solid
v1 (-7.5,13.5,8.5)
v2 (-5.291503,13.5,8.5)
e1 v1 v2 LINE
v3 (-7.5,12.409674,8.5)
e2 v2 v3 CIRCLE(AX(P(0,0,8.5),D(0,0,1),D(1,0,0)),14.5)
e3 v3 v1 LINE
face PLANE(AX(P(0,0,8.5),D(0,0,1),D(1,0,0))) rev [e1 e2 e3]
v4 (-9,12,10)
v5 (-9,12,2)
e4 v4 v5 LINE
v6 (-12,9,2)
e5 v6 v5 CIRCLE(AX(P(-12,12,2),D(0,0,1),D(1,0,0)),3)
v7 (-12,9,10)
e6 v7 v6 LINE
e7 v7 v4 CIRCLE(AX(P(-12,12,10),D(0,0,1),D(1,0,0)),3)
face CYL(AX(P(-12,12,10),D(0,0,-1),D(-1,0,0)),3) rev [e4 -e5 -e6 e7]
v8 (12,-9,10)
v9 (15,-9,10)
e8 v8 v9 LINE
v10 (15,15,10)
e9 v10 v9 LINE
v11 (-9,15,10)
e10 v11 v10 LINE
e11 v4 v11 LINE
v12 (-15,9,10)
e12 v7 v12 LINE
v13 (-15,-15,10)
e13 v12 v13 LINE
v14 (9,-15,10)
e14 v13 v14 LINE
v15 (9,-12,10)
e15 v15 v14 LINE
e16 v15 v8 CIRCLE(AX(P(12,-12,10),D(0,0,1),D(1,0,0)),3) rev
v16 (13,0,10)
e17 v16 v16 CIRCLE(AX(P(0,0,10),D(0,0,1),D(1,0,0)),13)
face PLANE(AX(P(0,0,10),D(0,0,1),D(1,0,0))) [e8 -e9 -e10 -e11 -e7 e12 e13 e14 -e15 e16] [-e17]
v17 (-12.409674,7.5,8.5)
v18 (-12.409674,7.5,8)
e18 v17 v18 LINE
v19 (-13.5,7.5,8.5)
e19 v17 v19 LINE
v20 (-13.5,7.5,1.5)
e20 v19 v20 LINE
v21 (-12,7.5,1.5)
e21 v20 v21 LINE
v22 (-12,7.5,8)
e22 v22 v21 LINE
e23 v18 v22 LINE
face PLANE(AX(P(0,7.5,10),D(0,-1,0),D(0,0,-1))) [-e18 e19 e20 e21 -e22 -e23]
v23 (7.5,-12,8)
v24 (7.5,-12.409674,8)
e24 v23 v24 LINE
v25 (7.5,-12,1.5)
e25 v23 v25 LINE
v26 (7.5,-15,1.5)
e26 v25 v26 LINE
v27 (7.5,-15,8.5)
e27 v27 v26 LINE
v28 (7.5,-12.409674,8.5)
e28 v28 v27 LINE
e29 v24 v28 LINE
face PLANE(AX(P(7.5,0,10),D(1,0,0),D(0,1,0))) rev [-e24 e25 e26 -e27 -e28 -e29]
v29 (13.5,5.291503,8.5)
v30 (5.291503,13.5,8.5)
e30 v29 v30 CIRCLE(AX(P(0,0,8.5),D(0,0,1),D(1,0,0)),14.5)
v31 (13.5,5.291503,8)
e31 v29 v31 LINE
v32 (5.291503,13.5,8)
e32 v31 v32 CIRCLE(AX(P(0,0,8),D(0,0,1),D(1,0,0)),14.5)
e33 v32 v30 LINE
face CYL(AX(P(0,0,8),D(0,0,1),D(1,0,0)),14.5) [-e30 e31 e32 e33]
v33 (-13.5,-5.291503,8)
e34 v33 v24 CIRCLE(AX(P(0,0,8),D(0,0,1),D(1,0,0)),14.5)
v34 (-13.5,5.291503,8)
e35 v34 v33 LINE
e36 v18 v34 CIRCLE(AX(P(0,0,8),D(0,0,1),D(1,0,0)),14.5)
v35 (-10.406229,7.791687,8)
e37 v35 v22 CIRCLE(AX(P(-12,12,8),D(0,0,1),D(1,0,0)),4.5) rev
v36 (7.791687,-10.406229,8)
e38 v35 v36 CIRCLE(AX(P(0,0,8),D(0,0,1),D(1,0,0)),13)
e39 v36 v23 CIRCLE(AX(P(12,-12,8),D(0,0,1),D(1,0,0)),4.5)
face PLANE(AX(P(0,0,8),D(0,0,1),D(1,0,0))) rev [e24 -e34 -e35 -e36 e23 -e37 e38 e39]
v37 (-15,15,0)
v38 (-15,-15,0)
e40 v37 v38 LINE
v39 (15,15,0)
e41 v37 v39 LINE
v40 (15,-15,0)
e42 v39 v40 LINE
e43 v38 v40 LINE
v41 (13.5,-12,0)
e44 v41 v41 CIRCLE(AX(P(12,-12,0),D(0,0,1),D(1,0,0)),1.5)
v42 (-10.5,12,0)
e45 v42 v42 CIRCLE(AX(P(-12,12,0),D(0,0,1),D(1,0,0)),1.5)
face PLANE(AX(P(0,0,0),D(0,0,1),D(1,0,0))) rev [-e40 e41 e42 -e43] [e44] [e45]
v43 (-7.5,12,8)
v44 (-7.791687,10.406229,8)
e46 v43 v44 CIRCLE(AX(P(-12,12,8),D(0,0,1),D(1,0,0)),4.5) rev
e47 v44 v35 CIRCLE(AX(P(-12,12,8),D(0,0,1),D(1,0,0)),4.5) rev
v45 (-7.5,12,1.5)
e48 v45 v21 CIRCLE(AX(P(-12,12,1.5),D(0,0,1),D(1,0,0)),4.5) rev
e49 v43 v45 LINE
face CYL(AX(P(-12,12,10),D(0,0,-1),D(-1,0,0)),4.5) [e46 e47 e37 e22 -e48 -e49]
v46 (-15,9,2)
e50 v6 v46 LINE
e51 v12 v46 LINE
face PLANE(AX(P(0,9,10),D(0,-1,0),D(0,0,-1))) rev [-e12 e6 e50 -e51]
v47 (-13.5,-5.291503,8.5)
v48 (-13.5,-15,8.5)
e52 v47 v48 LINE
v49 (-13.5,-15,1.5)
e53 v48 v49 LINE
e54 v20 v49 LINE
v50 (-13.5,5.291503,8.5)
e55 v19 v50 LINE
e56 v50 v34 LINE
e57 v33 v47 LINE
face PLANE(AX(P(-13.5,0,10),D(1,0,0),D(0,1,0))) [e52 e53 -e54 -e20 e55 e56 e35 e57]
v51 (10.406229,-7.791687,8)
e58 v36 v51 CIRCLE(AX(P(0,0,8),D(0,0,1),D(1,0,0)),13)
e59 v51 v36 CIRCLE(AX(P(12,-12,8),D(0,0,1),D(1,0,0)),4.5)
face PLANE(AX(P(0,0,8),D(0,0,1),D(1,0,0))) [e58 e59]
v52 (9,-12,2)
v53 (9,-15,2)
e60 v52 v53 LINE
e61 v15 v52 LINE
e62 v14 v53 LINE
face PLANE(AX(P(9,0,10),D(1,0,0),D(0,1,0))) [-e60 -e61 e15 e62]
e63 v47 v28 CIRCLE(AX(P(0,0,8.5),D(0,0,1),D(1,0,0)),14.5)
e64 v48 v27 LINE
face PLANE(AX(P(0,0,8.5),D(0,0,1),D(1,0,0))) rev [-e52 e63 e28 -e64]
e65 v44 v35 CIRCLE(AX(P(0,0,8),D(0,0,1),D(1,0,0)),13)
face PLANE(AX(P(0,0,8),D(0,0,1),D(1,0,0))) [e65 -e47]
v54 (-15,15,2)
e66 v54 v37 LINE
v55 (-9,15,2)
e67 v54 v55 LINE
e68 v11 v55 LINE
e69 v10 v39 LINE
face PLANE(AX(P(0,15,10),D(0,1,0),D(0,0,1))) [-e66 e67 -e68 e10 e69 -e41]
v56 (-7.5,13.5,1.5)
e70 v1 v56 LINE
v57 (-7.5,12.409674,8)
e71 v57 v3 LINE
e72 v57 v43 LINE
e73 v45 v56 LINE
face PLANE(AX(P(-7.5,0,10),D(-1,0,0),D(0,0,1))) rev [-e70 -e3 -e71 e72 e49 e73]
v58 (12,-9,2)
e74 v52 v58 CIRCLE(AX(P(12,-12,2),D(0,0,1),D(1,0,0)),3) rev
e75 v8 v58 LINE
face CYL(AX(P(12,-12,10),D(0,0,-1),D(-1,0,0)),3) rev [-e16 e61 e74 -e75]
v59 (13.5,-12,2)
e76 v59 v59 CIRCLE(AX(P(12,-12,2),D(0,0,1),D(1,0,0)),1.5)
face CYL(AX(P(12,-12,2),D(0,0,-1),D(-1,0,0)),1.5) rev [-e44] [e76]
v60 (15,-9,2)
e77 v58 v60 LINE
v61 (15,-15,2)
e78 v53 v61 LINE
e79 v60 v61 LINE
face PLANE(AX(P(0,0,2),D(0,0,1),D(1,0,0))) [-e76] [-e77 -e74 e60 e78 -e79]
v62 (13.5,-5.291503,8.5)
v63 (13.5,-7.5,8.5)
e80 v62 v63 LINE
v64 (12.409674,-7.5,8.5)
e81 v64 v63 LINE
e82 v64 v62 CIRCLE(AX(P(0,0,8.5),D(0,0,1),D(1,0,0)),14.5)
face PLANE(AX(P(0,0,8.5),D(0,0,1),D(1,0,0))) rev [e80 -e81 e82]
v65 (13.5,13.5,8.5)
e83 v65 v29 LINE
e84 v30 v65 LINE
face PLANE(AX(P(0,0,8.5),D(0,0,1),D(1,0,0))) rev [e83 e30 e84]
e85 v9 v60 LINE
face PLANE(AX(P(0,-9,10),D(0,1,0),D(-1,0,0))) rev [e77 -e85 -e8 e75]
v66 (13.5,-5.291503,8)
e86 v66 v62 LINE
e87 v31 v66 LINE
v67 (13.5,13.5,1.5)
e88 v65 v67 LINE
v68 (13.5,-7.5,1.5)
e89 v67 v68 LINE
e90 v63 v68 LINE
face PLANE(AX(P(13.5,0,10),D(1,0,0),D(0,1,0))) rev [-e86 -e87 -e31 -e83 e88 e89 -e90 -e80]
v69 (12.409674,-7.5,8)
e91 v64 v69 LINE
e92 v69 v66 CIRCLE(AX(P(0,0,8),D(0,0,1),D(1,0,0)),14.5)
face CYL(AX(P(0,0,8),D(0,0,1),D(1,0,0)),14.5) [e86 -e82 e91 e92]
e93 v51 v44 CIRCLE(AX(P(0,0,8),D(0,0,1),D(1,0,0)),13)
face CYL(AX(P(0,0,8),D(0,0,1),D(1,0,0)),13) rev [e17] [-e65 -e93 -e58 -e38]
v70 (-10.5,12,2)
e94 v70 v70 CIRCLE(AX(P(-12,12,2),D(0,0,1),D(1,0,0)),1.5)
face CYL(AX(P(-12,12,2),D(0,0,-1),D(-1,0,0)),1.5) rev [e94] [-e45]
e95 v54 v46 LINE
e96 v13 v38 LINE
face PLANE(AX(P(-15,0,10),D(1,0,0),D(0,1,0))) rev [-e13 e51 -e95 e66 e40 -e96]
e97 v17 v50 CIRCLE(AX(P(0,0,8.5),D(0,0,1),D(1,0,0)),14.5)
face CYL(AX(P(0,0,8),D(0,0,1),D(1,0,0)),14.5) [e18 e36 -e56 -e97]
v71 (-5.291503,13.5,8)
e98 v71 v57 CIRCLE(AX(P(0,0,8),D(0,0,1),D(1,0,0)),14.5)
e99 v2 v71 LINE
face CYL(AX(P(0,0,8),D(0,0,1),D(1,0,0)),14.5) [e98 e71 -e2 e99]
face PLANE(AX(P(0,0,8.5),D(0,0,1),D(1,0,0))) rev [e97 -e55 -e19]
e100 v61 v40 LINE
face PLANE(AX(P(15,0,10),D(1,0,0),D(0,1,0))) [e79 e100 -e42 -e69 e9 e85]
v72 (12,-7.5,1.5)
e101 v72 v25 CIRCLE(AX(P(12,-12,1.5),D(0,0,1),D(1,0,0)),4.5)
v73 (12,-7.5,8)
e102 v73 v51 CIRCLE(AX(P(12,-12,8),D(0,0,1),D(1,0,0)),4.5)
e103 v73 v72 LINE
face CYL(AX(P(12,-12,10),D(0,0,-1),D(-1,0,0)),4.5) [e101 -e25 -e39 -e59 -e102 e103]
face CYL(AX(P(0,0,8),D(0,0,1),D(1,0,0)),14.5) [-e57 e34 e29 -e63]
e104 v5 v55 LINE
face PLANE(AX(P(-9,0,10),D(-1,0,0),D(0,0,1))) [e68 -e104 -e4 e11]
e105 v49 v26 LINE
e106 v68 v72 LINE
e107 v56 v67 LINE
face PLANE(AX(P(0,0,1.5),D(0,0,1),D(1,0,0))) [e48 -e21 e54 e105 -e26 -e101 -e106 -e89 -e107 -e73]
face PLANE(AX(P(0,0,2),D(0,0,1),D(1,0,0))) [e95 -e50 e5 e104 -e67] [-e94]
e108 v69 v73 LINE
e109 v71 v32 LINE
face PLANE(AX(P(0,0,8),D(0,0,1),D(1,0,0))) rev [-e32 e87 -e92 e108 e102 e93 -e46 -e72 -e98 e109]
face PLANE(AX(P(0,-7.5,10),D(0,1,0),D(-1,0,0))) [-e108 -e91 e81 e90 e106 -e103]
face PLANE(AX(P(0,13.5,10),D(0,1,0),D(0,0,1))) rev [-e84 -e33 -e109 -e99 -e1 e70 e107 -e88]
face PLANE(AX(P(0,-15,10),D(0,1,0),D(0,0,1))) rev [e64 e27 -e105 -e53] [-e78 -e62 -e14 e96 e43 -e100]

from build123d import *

# Parameters (mm, degrees)
RESSALTO_EXTRUS_O1_DEPTH = 10
ESBO_O1_3_R              = 1.5
RESSALTO_EXTRUS_O2_DEPTH = 2
ESBO_O2_R                = 13
CORTE_EXTRUS_O1_DEPTH    = 2
CASCA1_START             = 1.5
CASCA1_DEPTH             = 6.5
CASCA1_START_2           = 8
CASCA1_2_DEPTH           = 0.5


# Read off the part's stored shape, not the designer's step: Casca1
with BuildPart() as part:
    # Esboço1 → Ressalto-extrusão1 (new body)
    with BuildSketch(Plane.XY):
        with BuildLine():
            Line((-9, 15), (-9, 12))
            ThreePointArc((-9, 12), (-9.878679656, 9.878679656), (-12, 9))
            Line((-12, 9), (-15, 9))
            Line((-15, 9), (-15, -15))
            Line((-15, -15), (9, -15))
            Line((9, -15), (9, -12))
            ThreePointArc((9, -12), (9.878679656, -9.878679656), (12, -9))
            Line((12, -9), (15, -9))
            Line((15, -9), (15, 15))
            Line((15, 15), (-9, 15))
        make_face()
    extrude(amount=RESSALTO_EXTRUS_O1_DEPTH)

    # Esboço1<3> → Ressalto-extrusão2 (add)
    # profile 1 of 2: a face of its own
    with BuildSketch(Plane.XY):
        with BuildLine():
            ThreePointArc((-12, 9), (-9.878679656, 9.878679656), (-9, 12))
            Line((-9, 12), (-9, 15))
            Line((-9, 15), (-15, 15))
            Line((-15, 15), (-15, 9))
            Line((-15, 9), (-12, 9))
        make_face()
        with Locations((-12, 12)):
            Circle(ESBO_O1_3_R, mode=Mode.SUBTRACT)
    # profile 2 of 2: a face of its own
    with BuildSketch(Plane.XY):
        with BuildLine():
            Line((15, -15), (15, -9))
            Line((15, -9), (12, -9))
            ThreePointArc((12, -9), (9.878679656, -9.878679656), (9, -12))
            Line((9, -12), (9, -15))
            Line((9, -15), (15, -15))
        make_face()
        with Locations((12, -12)):
            Circle(ESBO_O1_3_R, mode=Mode.SUBTRACT)
    extrude(amount=RESSALTO_EXTRUS_O2_DEPTH)

    # Esboço2 → Corte-extrusão1 (cut)
    with BuildSketch(Plane.XY.offset(10)):
        Circle(ESBO_O2_R)
    extrude(amount=-CORTE_EXTRUS_O1_DEPTH, mode=Mode.SUBTRACT)

    # Casca1 outline → Casca1 (cut)
    with BuildSketch(Plane.XY.offset(CASCA1_START)):
        with BuildLine():
            Line((-13.5, -15), (7.5, -15))
            Line((7.5, -15), (7.5, -12))
            ThreePointArc((7.5, -12), (8.818019485, -8.818019485), (12, -7.5))
            Line((12, -7.5), (13.5, -7.5))
            Line((13.5, -7.5), (13.5, 13.5))
            Line((13.5, 13.5), (-7.5, 13.5))
            Line((-7.5, 13.5), (-7.5, 12))
            ThreePointArc((-7.5, 12), (-8.818019485, 8.818019485), (-12, 7.5))
            Line((-12, 7.5), (-13.5, 7.5))
            Line((-13.5, 7.5), (-13.5, -15))
        make_face()
    extrude(amount=CASCA1_DEPTH, mode=Mode.SUBTRACT)

    # Casca1 2 outline → Casca1 2 (cut)
    with BuildSketch(Plane.XY.offset(CASCA1_START_2)):
        with BuildLine():
            Line((-13.5, -5.291502622), (-13.5, -15))
            Line((-13.5, -15), (7.5, -15))
            Line((7.5, -15), (7.5, -12.409673646))
            ThreePointArc((7.5, -12.409673646), (-4.65479212, -13.732549302), (-13.5, -5.291502622))
        make_face()
        with BuildLine():
            Line((-13.5, 7.5), (-13.5, 5.291502622))
            ThreePointArc((-13.5, 5.291502622), (-13.001813807, 6.418943661), (-12.409673646, 7.5))
            Line((-12.409673646, 7.5), (-13.5, 7.5))
        make_face()
        with BuildLine():
            ThreePointArc((13.5, -5.291502622), (13.001813807, -6.418943661), (12.409673646, -7.5))
            Line((12.409673646, -7.5), (13.5, -7.5))
            Line((13.5, -7.5), (13.5, -5.291502622))
        make_face()
        with BuildLine():
            Line((-7.5, 13.5), (-7.5, 12.409673646))
            ThreePointArc((-7.5, 12.409673646), (-6.418943661, 13.001813807), (-5.291502622, 13.5))
            Line((-5.291502622, 13.5), (-7.5, 13.5))
        make_face()
        with BuildLine():
            ThreePointArc((5.291502622, 13.5), (10.253048327, 10.253048327), (13.5, 5.291502622))
            Line((13.5, 5.291502622), (13.5, 13.5))
            Line((13.5, 13.5), (5.291502622, 13.5))
        make_face()
    extrude(amount=CASCA1_2_DEPTH, mode=Mode.SUBTRACT)


solid = part.part
